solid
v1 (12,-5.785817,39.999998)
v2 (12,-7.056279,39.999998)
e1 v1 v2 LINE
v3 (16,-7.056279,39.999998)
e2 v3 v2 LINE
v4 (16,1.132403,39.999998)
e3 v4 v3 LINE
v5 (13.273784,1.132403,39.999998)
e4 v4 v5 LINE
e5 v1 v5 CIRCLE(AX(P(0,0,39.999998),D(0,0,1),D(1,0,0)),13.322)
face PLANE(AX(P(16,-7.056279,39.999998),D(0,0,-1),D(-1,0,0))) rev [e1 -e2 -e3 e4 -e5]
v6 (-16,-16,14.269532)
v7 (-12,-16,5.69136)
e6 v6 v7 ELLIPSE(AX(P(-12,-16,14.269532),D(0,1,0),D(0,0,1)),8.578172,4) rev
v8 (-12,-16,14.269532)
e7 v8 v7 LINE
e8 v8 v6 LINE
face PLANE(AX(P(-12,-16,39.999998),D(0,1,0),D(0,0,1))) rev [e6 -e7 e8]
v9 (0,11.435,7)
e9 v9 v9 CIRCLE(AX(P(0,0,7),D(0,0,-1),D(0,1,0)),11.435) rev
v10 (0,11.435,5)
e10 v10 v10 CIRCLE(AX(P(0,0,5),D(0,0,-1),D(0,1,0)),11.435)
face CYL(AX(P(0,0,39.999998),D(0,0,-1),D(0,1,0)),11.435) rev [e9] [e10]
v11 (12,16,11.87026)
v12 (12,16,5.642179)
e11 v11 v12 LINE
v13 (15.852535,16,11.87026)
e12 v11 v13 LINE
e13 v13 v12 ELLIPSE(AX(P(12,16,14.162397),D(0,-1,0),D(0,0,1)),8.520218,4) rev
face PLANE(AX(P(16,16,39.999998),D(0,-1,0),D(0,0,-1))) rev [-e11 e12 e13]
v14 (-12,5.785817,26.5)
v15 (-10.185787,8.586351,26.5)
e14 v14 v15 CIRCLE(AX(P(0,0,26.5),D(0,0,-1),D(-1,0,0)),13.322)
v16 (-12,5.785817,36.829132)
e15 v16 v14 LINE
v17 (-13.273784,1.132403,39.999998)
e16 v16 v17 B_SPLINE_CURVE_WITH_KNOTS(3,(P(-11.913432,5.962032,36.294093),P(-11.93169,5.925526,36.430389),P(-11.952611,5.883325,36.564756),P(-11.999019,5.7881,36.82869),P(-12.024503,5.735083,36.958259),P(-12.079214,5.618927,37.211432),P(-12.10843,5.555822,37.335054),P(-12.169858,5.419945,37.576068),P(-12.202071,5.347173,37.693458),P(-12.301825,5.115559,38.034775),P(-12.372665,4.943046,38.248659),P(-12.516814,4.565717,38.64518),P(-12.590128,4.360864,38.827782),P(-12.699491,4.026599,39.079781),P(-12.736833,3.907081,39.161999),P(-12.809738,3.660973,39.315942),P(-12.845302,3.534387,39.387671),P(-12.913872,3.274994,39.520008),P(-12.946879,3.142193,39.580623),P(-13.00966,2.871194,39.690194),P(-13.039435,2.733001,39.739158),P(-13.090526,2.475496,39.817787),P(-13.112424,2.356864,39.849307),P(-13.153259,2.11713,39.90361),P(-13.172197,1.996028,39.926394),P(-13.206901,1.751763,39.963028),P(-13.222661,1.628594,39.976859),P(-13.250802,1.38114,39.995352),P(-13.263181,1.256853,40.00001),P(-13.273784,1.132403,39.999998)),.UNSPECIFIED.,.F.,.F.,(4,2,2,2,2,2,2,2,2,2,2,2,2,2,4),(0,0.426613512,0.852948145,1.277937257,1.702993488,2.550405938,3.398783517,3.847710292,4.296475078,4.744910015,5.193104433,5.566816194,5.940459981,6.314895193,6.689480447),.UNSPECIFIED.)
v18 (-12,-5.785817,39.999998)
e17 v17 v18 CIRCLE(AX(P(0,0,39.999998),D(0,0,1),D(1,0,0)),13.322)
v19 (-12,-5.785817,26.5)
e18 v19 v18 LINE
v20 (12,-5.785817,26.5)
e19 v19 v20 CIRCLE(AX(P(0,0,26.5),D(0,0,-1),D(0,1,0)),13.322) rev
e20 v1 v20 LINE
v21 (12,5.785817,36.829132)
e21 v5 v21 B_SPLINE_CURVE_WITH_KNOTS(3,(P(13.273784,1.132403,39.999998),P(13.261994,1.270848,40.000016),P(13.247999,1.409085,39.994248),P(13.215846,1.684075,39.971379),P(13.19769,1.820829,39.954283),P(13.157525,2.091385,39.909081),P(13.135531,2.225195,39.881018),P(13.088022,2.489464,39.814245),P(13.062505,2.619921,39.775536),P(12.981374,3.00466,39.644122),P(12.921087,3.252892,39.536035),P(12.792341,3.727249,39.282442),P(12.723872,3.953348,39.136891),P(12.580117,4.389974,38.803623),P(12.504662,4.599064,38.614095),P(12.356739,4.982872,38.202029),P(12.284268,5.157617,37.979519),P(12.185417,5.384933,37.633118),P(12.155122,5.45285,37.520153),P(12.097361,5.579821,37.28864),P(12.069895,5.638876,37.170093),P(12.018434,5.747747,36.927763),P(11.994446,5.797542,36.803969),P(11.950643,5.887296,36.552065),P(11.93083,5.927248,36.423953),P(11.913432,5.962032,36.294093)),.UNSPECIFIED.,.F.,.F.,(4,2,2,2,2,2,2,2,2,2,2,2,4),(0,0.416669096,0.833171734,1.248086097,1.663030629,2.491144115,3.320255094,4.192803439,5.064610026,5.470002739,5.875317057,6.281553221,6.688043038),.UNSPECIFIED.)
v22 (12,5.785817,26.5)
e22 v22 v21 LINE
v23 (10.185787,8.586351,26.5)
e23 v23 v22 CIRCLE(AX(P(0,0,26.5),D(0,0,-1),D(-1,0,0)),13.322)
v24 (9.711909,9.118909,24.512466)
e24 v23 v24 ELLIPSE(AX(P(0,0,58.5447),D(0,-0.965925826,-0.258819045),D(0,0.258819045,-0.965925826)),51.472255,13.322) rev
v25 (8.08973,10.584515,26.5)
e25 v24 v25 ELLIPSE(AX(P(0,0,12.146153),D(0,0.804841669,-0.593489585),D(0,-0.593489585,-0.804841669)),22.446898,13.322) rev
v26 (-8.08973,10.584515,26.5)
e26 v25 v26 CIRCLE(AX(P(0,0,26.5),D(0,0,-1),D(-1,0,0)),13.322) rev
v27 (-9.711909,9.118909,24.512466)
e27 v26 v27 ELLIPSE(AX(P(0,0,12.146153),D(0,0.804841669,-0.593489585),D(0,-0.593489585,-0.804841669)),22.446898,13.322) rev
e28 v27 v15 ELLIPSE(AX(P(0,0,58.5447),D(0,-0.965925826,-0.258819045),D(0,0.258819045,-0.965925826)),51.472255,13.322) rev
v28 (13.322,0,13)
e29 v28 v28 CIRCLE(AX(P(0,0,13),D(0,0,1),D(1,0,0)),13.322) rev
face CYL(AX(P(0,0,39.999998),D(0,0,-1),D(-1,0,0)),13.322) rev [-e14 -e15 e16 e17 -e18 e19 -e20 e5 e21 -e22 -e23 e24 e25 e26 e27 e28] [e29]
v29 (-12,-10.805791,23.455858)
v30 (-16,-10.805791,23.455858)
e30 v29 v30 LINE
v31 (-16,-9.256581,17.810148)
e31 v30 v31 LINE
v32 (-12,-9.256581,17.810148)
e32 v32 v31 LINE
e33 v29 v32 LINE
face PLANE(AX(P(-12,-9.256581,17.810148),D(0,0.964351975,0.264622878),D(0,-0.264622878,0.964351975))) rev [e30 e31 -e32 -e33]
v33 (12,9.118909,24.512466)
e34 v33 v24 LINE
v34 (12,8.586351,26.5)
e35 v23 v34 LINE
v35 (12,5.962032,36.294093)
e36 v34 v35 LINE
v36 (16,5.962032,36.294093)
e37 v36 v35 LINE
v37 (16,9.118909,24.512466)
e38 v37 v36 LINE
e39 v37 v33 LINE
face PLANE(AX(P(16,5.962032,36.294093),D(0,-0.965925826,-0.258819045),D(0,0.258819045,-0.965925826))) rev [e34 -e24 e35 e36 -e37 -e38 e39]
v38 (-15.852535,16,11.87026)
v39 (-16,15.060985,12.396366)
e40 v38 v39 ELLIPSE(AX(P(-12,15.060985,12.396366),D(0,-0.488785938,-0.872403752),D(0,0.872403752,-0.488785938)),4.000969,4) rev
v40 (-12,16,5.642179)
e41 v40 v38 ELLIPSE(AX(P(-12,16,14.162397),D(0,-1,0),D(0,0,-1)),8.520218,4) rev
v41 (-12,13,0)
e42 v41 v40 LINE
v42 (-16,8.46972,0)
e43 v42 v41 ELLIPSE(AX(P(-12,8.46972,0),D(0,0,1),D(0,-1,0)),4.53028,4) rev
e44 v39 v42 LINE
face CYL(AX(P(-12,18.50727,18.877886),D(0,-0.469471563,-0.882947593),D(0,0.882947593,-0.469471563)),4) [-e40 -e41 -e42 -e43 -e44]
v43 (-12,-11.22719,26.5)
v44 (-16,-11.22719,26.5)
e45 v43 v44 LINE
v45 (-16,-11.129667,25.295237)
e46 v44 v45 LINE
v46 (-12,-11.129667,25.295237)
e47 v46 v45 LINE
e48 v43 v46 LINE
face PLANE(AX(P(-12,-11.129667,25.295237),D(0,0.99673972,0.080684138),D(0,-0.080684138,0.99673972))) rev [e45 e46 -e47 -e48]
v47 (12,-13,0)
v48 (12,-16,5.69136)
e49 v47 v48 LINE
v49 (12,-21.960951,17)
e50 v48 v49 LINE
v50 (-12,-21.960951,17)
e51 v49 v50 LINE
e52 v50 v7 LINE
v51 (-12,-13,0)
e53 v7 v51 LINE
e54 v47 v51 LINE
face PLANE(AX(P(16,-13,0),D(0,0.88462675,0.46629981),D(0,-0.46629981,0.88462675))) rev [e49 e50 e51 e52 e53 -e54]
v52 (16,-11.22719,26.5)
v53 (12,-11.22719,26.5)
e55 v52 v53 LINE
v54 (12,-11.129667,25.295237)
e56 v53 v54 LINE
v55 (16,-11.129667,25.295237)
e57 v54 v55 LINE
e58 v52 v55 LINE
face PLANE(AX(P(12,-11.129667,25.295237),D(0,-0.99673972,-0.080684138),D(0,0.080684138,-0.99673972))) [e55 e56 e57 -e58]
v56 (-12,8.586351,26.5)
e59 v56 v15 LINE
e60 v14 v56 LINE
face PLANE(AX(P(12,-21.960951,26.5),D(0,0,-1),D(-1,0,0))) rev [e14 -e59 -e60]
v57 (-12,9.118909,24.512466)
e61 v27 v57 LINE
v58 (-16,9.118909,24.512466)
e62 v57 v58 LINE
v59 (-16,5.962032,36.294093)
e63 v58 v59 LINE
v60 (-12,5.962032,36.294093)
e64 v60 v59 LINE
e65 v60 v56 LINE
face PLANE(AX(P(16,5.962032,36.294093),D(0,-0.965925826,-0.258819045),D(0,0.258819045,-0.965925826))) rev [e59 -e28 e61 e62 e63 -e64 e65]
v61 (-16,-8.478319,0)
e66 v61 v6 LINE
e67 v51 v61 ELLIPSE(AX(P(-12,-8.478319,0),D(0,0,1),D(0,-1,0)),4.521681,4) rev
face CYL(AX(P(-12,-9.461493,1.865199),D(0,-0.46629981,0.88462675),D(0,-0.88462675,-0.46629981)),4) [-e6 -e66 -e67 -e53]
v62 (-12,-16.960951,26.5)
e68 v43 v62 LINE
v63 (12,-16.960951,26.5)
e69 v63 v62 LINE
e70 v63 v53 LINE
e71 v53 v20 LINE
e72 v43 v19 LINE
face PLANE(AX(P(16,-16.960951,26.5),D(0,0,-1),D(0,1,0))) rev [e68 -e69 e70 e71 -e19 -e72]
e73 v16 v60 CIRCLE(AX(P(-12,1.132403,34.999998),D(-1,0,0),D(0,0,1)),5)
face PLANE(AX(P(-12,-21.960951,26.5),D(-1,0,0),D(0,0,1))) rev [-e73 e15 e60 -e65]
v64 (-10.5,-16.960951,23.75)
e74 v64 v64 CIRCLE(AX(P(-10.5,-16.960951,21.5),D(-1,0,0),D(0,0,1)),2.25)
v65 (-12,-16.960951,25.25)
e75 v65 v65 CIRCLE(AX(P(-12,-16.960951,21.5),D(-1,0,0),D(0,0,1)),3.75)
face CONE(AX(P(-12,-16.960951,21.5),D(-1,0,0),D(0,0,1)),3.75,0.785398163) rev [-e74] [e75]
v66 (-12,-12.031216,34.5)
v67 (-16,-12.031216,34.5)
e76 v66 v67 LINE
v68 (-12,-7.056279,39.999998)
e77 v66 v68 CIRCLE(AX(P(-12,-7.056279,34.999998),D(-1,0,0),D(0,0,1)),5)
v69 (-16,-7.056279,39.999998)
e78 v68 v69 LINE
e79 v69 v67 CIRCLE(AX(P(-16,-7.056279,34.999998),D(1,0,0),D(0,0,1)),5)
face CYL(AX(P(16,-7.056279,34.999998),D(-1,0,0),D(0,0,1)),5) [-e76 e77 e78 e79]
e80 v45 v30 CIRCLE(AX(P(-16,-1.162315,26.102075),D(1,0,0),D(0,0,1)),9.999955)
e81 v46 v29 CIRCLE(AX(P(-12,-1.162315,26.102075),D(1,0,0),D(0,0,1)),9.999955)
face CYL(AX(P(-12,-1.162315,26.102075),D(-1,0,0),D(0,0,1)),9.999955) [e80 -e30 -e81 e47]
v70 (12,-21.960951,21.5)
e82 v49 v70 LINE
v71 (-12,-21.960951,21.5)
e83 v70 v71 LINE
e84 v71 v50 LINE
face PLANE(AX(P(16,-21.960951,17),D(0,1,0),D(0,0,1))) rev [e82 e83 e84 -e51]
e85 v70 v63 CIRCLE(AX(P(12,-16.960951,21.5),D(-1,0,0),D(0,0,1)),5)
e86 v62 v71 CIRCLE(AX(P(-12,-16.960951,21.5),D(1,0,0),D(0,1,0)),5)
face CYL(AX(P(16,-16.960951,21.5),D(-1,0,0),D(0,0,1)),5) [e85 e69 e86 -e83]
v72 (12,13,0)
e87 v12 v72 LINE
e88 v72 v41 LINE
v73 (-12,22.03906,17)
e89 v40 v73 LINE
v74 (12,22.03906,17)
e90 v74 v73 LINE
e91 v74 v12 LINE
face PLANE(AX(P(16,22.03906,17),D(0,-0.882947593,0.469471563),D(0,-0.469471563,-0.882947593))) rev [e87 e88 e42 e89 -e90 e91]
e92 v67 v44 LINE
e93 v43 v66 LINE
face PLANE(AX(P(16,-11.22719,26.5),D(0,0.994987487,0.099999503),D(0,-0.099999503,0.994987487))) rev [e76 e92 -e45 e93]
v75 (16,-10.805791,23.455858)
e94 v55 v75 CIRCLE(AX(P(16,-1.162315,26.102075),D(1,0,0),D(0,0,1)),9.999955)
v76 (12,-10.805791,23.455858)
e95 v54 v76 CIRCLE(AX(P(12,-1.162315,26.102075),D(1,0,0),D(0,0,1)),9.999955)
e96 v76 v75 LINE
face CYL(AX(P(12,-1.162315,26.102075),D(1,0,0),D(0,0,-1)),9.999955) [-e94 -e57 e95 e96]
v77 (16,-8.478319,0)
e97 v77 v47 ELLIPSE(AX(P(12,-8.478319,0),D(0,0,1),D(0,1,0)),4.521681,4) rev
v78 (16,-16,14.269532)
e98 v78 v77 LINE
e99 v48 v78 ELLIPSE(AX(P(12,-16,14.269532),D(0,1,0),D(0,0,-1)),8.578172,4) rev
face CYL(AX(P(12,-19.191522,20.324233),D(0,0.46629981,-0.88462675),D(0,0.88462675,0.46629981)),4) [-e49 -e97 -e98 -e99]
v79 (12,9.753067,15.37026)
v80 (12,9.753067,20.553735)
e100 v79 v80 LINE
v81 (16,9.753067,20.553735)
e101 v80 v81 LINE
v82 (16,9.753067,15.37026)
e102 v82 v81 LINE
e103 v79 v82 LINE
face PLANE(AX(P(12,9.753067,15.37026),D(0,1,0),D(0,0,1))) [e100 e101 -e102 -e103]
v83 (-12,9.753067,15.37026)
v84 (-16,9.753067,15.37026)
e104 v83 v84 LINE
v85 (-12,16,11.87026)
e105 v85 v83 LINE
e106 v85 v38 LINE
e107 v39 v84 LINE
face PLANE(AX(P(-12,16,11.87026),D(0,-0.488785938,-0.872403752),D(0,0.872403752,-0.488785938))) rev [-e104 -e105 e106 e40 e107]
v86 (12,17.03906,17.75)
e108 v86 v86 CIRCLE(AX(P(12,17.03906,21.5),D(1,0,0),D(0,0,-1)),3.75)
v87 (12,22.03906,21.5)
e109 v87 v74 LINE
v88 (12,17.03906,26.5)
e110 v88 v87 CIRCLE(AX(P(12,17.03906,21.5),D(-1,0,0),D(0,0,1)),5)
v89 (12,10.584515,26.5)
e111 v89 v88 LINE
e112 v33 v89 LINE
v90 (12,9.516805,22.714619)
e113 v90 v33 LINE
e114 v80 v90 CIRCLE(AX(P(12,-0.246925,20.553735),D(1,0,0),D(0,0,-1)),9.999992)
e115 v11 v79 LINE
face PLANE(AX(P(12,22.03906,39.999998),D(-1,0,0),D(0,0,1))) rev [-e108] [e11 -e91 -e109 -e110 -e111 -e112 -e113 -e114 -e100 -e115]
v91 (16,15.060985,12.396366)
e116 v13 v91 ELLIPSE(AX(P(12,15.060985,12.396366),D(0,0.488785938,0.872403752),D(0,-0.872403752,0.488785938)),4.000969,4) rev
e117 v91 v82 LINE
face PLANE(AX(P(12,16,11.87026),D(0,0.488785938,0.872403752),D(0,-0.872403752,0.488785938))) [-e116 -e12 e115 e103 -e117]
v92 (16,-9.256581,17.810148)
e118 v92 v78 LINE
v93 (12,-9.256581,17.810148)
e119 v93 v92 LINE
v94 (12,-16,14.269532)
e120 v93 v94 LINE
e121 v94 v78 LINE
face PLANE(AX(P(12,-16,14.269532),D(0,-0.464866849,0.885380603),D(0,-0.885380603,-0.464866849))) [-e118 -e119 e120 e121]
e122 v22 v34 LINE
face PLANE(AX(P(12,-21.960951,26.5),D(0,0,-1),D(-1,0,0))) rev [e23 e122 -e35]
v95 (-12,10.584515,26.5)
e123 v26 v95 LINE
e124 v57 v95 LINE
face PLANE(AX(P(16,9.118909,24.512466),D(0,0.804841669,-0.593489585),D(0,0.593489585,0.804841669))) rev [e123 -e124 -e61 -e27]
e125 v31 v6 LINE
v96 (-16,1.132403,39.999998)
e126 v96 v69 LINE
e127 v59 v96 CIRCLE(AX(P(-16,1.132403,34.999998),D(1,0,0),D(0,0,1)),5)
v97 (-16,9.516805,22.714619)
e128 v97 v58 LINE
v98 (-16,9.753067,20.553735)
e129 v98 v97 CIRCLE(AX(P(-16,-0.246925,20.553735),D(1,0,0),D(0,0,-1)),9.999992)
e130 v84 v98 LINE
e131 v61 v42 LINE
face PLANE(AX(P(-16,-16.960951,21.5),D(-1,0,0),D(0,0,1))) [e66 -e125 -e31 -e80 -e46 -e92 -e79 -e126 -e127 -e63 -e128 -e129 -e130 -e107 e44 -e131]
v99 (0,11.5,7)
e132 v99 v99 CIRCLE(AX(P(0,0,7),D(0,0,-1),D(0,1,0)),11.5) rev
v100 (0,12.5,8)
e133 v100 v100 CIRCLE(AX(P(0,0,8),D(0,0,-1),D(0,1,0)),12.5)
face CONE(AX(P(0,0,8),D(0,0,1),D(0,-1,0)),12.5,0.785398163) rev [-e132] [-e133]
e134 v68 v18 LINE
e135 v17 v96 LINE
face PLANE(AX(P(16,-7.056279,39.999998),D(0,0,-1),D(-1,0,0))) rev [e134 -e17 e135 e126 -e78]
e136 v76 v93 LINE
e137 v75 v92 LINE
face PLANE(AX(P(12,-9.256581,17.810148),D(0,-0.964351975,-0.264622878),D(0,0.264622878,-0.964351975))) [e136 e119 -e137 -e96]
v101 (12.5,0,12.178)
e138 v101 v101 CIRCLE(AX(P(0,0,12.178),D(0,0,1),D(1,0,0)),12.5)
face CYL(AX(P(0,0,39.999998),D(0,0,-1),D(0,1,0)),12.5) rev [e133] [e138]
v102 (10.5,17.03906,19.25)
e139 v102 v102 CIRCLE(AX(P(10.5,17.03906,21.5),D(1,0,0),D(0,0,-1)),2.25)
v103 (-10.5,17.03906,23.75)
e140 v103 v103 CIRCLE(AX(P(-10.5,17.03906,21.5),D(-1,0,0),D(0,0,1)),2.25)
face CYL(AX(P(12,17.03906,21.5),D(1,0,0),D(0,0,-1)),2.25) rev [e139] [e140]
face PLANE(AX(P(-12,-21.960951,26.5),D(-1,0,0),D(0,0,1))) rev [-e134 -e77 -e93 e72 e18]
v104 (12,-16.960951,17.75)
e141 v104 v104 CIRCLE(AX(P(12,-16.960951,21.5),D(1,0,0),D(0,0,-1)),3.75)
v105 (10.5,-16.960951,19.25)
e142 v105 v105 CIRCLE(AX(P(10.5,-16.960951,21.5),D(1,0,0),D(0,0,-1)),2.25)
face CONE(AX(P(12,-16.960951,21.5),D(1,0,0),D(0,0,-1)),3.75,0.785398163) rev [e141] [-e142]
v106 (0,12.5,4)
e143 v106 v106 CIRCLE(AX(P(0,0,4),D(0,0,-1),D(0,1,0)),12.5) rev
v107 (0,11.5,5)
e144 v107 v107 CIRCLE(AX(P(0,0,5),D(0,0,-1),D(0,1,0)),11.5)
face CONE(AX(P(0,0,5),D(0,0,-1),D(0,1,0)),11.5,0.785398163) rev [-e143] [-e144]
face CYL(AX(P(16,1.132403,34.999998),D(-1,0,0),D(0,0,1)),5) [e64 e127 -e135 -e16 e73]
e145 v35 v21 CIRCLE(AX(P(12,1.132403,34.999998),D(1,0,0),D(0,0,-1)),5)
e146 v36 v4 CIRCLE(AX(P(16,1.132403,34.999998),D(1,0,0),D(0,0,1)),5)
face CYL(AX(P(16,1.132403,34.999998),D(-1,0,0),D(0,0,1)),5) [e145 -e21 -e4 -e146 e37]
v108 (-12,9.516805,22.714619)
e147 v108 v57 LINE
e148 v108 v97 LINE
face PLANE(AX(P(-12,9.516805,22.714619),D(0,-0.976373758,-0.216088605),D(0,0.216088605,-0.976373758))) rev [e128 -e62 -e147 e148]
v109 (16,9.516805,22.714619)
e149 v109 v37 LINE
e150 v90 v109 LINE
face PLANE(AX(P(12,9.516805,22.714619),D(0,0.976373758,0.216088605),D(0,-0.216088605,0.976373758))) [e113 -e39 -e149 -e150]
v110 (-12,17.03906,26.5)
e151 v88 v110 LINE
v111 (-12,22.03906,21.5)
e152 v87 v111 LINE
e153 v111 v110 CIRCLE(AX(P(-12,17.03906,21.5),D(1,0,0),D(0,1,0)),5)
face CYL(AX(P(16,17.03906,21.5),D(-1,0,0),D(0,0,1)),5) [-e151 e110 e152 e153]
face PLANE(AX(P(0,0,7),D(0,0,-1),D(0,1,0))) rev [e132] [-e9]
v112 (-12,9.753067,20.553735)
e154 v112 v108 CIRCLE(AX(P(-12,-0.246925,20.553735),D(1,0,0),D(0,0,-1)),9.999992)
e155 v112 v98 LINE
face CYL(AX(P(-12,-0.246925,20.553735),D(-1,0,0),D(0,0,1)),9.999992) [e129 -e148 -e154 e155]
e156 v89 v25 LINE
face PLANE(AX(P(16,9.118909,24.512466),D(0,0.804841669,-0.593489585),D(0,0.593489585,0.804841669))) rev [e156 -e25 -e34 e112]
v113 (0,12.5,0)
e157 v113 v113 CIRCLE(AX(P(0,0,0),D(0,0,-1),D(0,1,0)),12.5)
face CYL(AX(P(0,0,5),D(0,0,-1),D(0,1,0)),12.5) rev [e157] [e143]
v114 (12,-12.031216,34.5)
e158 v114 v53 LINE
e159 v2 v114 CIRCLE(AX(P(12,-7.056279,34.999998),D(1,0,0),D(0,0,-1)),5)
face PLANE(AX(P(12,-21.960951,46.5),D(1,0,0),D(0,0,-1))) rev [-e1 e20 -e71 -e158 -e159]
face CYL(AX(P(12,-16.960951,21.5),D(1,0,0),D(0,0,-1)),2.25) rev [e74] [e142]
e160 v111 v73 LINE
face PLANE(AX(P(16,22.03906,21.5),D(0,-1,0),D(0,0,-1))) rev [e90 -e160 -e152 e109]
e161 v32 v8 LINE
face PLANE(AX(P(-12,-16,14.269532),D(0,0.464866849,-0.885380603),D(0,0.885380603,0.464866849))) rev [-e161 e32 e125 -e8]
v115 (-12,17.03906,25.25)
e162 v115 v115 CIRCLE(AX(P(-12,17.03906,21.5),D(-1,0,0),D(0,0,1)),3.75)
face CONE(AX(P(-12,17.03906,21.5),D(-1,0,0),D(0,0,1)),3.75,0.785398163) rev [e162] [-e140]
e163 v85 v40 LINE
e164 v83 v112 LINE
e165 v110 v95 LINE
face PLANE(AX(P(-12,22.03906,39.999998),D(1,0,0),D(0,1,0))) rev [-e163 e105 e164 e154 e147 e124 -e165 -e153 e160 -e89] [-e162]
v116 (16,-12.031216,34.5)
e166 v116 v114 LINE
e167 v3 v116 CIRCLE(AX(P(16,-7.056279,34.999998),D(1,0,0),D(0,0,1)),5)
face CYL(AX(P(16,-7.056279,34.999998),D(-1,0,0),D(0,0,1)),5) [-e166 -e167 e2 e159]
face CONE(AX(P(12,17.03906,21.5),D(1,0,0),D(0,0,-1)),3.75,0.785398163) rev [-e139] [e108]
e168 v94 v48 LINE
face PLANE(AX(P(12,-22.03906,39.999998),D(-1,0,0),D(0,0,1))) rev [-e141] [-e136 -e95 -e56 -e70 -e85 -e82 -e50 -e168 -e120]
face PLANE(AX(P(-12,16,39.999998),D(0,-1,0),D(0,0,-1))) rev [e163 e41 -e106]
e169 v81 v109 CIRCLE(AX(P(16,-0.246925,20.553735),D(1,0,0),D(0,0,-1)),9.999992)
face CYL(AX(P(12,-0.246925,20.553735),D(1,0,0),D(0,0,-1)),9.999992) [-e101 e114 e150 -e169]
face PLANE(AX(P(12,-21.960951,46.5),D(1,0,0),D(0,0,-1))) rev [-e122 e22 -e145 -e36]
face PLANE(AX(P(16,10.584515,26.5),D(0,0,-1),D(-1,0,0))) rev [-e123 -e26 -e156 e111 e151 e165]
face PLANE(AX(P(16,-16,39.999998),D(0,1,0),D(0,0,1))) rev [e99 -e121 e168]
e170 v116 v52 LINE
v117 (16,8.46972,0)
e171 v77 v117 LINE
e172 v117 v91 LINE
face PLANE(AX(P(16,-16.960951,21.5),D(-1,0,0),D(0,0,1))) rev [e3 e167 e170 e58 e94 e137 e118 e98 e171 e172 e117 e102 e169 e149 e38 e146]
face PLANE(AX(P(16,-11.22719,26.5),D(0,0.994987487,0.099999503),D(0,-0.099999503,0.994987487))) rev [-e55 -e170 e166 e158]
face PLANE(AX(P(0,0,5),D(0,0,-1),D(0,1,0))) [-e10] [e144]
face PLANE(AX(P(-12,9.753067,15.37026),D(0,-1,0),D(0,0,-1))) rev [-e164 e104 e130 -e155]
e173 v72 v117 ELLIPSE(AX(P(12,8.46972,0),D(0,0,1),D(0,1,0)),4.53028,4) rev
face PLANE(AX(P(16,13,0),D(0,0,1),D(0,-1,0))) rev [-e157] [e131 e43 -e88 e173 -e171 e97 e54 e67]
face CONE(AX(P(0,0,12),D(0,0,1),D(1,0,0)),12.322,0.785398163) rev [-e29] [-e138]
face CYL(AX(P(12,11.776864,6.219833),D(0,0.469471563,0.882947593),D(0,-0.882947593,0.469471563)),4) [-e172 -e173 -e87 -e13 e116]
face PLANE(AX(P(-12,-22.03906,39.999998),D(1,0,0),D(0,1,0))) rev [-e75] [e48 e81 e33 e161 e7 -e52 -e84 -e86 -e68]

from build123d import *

# Parameters (mm, degrees)
BOSS_EXTRUDE1_DEPTH           = 16
SKETCH2_W                     = 4
SKETCH2_H                     = 6.039060338
CUT_EXTRUDE1_DEPTH            = 49.391321349
FILLET1_R                     = 4
CUT_EXTRUDE2_DEPTH            = 4
SKETCH4_R                     = 12.5
CUT_EXTRUDE3_DEPTH            = 5
SKETCH5_R                     = 11.435
CUT_EXTRUDE4_DEPTH            = 45.34771704
CUT_EXTRUDE5_START            = -2
SKETCH7_R                     = 12.5
CUT_EXTRUDE5_DEPTH            = 43.347717155
CUT_EXTRUDE6_START            = 5
SKETCH8_R                     = 13.322
CUT_EXTRUDE6_DEPTH            = 38.786914196
CHAMFER5_SIZE                 = 1
SKETCH9_W                     = 24
SKETCH9_H                     = 20
CUT_EXTRUDE7_DEPTH            = 59.111966759
CSK_FOR_M4_SFHCS1_D           = 4.5
CSK_FOR_M4_SFHCS1_CSINK_D     = 7.5
CSK_FOR_M4_SFHCS1_CSINK_ANGLE = 90


with BuildPart() as part:
    # Sketch1 → Boss-Extrude1 (new, symmetric)
    with BuildSketch(Plane(origin=(0, 0, 0), x_dir=(0, 0, -1), z_dir=(1, 0, 0))):
        with BuildLine():
            Line((0, 13), (0, -13))
            Line((0, -13), (-17, -21.960950792))
            Line((-17, -21.960950792), (-21.5, -21.960950792))
            ThreePointArc((-21.5, -21.960950792), (-25.035533906, -20.496484698), (-26.5, -16.960950792))
            Line((-26.5, -16.960950792), (-26.5, -11.227190102))
            Line((-26.5, -11.227190102), (-34.5, -12.031216319))
            ThreePointArc((-34.5, -12.031216319), (-38.354100408, -10.76437729), (-39.999997516, -7.056278884))
            Line((-39.999997516, -7.056278884), (-39.999997516, 1.132402994))
            ThreePointArc((-39.999997516, 1.132402994), (-38.966764217, 4.176210139), (-36.294092741, 5.962032125))
            Line((-36.294092741, 5.962032125), (-24.512466398, 9.118909389))
            Line((-24.512466398, 9.118909389), (-26.5, 10.584515032))
            Line((-26.5, 10.584515032), (-26.5, 17.039060338))
            ThreePointArc((-26.5, 17.039060338), (-25.035533906, 20.574594244), (-21.5, 22.039060338))
            Line((-21.5, 22.039060338), (-17, 22.039060338))
            Line((-17, 22.039060338), (0, 13))
        make_face()
    extrude(amount=BOSS_EXTRUDE1_DEPTH, both=True)

    # Sketch2 → Cut-Extrude1 (cut, through all)
    with BuildSketch(Plane(origin=(0, 0, 0), x_dir=(-1, 0, 0), z_dir=(0, 0, -1))):
        with Locations((-14, 19.019530169)):
            Rectangle(SKETCH2_W, SKETCH2_H)
        with Locations((14, 19.019530169)):
            Rectangle(SKETCH2_W, SKETCH2_H)
        with Locations((14, -19.019530169)):
            Rectangle(SKETCH2_W, SKETCH2_H)
        with Locations((-14, -19.019530169)):
            Rectangle(SKETCH2_W, SKETCH2_H)
    extrude(amount=-CUT_EXTRUDE1_DEPTH, mode=Mode.SUBTRACT)

    # Fillet1
    fillet1_edges = [part.edges().sort_by_distance(p)[0] for p in [
        (16, -14.5, 2.845680173),
        (-16, -14.5, 2.845680173),
        (16, 14.5, 2.821089698),
        (-16, 14.5, 2.821089698),
    ]]
    fillet(fillet1_edges, radius=FILLET1_R)

    # Sketch3 → Cut-Extrude2 (cut)
    with BuildSketch(Plane.ZY.offset(16)):
        with BuildLine():
            Line((14.269532395, -16), (17.810147733, -9.256580566))
            Line((17.810147733, -9.256580566), (23.455857772, -10.805790893))
            ThreePointArc((23.455857772, -10.805790893), (24.367969512, -11.010765142), (25.295236814, -11.12966687))
            Line((25.295236814, -11.12966687), (26.5, -11.227190102))
            Line((26.5, -11.227190102), (26.5, -16))
            Line((26.5, -16), (14.269532395, -16))
        make_face()
        with BuildLine():
            Line((11.870259532, 16), (15.370259532, 9.753066737))
            Line((15.370259532, 9.753066737), (20.553734624, 9.753066737))
            ThreePointArc((20.553734624, 9.753066737), (21.64061559, 9.693825703), (22.714618956, 9.516804502))
            Line((22.714618956, 9.516804502), (24.512466398, 9.118909389))
            Line((24.512466398, 9.118909389), (26.5, 10.584515032))
            Line((26.5, 10.584515032), (26.5, 16))
            Line((26.5, 16), (11.870259532, 16))
        make_face()
    cut_extrude2 = extrude(amount=-CUT_EXTRUDE2_DEPTH, mode=Mode.SUBTRACT)

    # Mirror1: Cut-Extrude2 across plane
    add(cut_extrude2.mirror(Plane(origin=(0, 0, 0), x_dir=(0, 0, 1), z_dir=(1, 0, 0))), mode=Mode.SUBTRACT)

    # Sketch4 → Cut-Extrude3 (cut)
    with BuildSketch(Plane(origin=(0, 0, 0), x_dir=(-1, 0, 0), z_dir=(0, 0, -1))):
        with Locations(Location((0, 0, 0), (0, 0, 90))):
            Circle(SKETCH4_R)
    extrude(amount=-CUT_EXTRUDE3_DEPTH, mode=Mode.SUBTRACT)

    # Sketch5 → Cut-Extrude4 (cut, through all)
    with BuildSketch(Plane(origin=(0, 0, 5), x_dir=(-1, 0, 0), z_dir=(0, 0, -1))):
        with Locations(Location((0, 0, 0), (0, 0, 90))):
            Circle(SKETCH5_R)
    extrude(amount=-CUT_EXTRUDE4_DEPTH, mode=Mode.SUBTRACT)

    # Sketch7 → Cut-Extrude5 (cut, through all)
    with BuildSketch(Plane(origin=(0, 0, 5), x_dir=(-1, 0, 0), z_dir=(0, 0, -1)).offset(CUT_EXTRUDE5_START)):
        with Locations(Location((0, 0, 0), (0, 0, 90))):
            Circle(SKETCH7_R)
    extrude(amount=-CUT_EXTRUDE5_DEPTH, mode=Mode.SUBTRACT)

    # Sketch8 → Cut-Extrude6 (cut, through all)
    with BuildSketch(Plane.XY.offset(7).offset(CUT_EXTRUDE6_START)):
        with Locations(Location((0, 0, 0), (0, 0, 175.123832714))):
            Circle(SKETCH8_R)
    extrude(amount=CUT_EXTRUDE6_DEPTH, mode=Mode.SUBTRACT)

    # Chamfer5
    # the kernel refuses this chamfer: 1 mm, written as the material it adds along each edge
    with BuildSketch(Plane(origin=(0, 0, 7), x_dir=(0, 1, 0), z_dir=(-1, 0, 0))) as chamfer5_piece_1:
        Polygon((12.5 - CHAMFER5_SIZE, 0), (12.5, -CHAMFER5_SIZE), (12.5, 0), align=None)
    revolve(axis=Axis((0, 0, 7), (0, 0, -1)))
    with BuildSketch(Plane(origin=(0, 0, 5), x_dir=(0, 1, 0), z_dir=(-1, 0, 0))) as chamfer5_piece_2:
        Polygon((12.5, CHAMFER5_SIZE), (12.5 - CHAMFER5_SIZE, 0), (12.5, 0), align=None)
    revolve(axis=Axis((0, 0, 5), (0, 0, -1)))
    with BuildSketch(Plane(origin=(0, 0, 12), x_dir=(-0.9963807399610061, 0.08500247663896625, 0), z_dir=(0.08500247663896625, 0.9963807399610061, 0))) as chamfer5_piece_3_section:
        Polygon((13.322, CHAMFER5_SIZE), (13.322 - CHAMFER5_SIZE, 0), (13.322, 0), align=None)
    chamfer5_piece_3 = revolve(axis=Axis((0, 0, 12), (0, 0, 1)), mode=Mode.PRIVATE)
    chamfer5_piece_3 = chamfer5_piece_3 - Plane(origin=(0, 0, 12.578358266), x_dir=(0, 1, 0), z_dir=(0, 0, -1)) * Cylinder(12.5, 54, mode=Mode.PRIVATE)
    add(chamfer5_piece_3)

    # Sketch9 → Cut-Extrude7 (cut, through all)
    with BuildSketch(Plane(origin=(0, 17.039060338, 0), x_dir=(-1, 0, 0), z_dir=(0, 1, 0))):
        with Locations((0, 36.5)):
            Rectangle(SKETCH9_W, SKETCH9_H)
    extrude(amount=-CUT_EXTRUDE7_DEPTH, mode=Mode.SUBTRACT)

    # CSK for M4 SFHCS1 (through all)
    with Locations(Plane(origin=(12, 0, 0), x_dir=(0, 0, -1), z_dir=(1, 0, 0))):
        with Locations((-21.5, 17.039060338), (-21.5, -16.960950792)):
            csk_for_m4_sfhcs1 = CounterSinkHole(CSK_FOR_M4_SFHCS1_D / 2, CSK_FOR_M4_SFHCS1_CSINK_D / 2, counter_sink_angle=CSK_FOR_M4_SFHCS1_CSINK_ANGLE)

    # Mirror2: CSK for M4 SFHCS1 across plane
    add(csk_for_m4_sfhcs1.mirror(Plane(origin=(0, 0, 0), x_dir=(0, 0, 1), z_dir=(1, 0, 0))), mode=Mode.SUBTRACT)


solid = part.part
